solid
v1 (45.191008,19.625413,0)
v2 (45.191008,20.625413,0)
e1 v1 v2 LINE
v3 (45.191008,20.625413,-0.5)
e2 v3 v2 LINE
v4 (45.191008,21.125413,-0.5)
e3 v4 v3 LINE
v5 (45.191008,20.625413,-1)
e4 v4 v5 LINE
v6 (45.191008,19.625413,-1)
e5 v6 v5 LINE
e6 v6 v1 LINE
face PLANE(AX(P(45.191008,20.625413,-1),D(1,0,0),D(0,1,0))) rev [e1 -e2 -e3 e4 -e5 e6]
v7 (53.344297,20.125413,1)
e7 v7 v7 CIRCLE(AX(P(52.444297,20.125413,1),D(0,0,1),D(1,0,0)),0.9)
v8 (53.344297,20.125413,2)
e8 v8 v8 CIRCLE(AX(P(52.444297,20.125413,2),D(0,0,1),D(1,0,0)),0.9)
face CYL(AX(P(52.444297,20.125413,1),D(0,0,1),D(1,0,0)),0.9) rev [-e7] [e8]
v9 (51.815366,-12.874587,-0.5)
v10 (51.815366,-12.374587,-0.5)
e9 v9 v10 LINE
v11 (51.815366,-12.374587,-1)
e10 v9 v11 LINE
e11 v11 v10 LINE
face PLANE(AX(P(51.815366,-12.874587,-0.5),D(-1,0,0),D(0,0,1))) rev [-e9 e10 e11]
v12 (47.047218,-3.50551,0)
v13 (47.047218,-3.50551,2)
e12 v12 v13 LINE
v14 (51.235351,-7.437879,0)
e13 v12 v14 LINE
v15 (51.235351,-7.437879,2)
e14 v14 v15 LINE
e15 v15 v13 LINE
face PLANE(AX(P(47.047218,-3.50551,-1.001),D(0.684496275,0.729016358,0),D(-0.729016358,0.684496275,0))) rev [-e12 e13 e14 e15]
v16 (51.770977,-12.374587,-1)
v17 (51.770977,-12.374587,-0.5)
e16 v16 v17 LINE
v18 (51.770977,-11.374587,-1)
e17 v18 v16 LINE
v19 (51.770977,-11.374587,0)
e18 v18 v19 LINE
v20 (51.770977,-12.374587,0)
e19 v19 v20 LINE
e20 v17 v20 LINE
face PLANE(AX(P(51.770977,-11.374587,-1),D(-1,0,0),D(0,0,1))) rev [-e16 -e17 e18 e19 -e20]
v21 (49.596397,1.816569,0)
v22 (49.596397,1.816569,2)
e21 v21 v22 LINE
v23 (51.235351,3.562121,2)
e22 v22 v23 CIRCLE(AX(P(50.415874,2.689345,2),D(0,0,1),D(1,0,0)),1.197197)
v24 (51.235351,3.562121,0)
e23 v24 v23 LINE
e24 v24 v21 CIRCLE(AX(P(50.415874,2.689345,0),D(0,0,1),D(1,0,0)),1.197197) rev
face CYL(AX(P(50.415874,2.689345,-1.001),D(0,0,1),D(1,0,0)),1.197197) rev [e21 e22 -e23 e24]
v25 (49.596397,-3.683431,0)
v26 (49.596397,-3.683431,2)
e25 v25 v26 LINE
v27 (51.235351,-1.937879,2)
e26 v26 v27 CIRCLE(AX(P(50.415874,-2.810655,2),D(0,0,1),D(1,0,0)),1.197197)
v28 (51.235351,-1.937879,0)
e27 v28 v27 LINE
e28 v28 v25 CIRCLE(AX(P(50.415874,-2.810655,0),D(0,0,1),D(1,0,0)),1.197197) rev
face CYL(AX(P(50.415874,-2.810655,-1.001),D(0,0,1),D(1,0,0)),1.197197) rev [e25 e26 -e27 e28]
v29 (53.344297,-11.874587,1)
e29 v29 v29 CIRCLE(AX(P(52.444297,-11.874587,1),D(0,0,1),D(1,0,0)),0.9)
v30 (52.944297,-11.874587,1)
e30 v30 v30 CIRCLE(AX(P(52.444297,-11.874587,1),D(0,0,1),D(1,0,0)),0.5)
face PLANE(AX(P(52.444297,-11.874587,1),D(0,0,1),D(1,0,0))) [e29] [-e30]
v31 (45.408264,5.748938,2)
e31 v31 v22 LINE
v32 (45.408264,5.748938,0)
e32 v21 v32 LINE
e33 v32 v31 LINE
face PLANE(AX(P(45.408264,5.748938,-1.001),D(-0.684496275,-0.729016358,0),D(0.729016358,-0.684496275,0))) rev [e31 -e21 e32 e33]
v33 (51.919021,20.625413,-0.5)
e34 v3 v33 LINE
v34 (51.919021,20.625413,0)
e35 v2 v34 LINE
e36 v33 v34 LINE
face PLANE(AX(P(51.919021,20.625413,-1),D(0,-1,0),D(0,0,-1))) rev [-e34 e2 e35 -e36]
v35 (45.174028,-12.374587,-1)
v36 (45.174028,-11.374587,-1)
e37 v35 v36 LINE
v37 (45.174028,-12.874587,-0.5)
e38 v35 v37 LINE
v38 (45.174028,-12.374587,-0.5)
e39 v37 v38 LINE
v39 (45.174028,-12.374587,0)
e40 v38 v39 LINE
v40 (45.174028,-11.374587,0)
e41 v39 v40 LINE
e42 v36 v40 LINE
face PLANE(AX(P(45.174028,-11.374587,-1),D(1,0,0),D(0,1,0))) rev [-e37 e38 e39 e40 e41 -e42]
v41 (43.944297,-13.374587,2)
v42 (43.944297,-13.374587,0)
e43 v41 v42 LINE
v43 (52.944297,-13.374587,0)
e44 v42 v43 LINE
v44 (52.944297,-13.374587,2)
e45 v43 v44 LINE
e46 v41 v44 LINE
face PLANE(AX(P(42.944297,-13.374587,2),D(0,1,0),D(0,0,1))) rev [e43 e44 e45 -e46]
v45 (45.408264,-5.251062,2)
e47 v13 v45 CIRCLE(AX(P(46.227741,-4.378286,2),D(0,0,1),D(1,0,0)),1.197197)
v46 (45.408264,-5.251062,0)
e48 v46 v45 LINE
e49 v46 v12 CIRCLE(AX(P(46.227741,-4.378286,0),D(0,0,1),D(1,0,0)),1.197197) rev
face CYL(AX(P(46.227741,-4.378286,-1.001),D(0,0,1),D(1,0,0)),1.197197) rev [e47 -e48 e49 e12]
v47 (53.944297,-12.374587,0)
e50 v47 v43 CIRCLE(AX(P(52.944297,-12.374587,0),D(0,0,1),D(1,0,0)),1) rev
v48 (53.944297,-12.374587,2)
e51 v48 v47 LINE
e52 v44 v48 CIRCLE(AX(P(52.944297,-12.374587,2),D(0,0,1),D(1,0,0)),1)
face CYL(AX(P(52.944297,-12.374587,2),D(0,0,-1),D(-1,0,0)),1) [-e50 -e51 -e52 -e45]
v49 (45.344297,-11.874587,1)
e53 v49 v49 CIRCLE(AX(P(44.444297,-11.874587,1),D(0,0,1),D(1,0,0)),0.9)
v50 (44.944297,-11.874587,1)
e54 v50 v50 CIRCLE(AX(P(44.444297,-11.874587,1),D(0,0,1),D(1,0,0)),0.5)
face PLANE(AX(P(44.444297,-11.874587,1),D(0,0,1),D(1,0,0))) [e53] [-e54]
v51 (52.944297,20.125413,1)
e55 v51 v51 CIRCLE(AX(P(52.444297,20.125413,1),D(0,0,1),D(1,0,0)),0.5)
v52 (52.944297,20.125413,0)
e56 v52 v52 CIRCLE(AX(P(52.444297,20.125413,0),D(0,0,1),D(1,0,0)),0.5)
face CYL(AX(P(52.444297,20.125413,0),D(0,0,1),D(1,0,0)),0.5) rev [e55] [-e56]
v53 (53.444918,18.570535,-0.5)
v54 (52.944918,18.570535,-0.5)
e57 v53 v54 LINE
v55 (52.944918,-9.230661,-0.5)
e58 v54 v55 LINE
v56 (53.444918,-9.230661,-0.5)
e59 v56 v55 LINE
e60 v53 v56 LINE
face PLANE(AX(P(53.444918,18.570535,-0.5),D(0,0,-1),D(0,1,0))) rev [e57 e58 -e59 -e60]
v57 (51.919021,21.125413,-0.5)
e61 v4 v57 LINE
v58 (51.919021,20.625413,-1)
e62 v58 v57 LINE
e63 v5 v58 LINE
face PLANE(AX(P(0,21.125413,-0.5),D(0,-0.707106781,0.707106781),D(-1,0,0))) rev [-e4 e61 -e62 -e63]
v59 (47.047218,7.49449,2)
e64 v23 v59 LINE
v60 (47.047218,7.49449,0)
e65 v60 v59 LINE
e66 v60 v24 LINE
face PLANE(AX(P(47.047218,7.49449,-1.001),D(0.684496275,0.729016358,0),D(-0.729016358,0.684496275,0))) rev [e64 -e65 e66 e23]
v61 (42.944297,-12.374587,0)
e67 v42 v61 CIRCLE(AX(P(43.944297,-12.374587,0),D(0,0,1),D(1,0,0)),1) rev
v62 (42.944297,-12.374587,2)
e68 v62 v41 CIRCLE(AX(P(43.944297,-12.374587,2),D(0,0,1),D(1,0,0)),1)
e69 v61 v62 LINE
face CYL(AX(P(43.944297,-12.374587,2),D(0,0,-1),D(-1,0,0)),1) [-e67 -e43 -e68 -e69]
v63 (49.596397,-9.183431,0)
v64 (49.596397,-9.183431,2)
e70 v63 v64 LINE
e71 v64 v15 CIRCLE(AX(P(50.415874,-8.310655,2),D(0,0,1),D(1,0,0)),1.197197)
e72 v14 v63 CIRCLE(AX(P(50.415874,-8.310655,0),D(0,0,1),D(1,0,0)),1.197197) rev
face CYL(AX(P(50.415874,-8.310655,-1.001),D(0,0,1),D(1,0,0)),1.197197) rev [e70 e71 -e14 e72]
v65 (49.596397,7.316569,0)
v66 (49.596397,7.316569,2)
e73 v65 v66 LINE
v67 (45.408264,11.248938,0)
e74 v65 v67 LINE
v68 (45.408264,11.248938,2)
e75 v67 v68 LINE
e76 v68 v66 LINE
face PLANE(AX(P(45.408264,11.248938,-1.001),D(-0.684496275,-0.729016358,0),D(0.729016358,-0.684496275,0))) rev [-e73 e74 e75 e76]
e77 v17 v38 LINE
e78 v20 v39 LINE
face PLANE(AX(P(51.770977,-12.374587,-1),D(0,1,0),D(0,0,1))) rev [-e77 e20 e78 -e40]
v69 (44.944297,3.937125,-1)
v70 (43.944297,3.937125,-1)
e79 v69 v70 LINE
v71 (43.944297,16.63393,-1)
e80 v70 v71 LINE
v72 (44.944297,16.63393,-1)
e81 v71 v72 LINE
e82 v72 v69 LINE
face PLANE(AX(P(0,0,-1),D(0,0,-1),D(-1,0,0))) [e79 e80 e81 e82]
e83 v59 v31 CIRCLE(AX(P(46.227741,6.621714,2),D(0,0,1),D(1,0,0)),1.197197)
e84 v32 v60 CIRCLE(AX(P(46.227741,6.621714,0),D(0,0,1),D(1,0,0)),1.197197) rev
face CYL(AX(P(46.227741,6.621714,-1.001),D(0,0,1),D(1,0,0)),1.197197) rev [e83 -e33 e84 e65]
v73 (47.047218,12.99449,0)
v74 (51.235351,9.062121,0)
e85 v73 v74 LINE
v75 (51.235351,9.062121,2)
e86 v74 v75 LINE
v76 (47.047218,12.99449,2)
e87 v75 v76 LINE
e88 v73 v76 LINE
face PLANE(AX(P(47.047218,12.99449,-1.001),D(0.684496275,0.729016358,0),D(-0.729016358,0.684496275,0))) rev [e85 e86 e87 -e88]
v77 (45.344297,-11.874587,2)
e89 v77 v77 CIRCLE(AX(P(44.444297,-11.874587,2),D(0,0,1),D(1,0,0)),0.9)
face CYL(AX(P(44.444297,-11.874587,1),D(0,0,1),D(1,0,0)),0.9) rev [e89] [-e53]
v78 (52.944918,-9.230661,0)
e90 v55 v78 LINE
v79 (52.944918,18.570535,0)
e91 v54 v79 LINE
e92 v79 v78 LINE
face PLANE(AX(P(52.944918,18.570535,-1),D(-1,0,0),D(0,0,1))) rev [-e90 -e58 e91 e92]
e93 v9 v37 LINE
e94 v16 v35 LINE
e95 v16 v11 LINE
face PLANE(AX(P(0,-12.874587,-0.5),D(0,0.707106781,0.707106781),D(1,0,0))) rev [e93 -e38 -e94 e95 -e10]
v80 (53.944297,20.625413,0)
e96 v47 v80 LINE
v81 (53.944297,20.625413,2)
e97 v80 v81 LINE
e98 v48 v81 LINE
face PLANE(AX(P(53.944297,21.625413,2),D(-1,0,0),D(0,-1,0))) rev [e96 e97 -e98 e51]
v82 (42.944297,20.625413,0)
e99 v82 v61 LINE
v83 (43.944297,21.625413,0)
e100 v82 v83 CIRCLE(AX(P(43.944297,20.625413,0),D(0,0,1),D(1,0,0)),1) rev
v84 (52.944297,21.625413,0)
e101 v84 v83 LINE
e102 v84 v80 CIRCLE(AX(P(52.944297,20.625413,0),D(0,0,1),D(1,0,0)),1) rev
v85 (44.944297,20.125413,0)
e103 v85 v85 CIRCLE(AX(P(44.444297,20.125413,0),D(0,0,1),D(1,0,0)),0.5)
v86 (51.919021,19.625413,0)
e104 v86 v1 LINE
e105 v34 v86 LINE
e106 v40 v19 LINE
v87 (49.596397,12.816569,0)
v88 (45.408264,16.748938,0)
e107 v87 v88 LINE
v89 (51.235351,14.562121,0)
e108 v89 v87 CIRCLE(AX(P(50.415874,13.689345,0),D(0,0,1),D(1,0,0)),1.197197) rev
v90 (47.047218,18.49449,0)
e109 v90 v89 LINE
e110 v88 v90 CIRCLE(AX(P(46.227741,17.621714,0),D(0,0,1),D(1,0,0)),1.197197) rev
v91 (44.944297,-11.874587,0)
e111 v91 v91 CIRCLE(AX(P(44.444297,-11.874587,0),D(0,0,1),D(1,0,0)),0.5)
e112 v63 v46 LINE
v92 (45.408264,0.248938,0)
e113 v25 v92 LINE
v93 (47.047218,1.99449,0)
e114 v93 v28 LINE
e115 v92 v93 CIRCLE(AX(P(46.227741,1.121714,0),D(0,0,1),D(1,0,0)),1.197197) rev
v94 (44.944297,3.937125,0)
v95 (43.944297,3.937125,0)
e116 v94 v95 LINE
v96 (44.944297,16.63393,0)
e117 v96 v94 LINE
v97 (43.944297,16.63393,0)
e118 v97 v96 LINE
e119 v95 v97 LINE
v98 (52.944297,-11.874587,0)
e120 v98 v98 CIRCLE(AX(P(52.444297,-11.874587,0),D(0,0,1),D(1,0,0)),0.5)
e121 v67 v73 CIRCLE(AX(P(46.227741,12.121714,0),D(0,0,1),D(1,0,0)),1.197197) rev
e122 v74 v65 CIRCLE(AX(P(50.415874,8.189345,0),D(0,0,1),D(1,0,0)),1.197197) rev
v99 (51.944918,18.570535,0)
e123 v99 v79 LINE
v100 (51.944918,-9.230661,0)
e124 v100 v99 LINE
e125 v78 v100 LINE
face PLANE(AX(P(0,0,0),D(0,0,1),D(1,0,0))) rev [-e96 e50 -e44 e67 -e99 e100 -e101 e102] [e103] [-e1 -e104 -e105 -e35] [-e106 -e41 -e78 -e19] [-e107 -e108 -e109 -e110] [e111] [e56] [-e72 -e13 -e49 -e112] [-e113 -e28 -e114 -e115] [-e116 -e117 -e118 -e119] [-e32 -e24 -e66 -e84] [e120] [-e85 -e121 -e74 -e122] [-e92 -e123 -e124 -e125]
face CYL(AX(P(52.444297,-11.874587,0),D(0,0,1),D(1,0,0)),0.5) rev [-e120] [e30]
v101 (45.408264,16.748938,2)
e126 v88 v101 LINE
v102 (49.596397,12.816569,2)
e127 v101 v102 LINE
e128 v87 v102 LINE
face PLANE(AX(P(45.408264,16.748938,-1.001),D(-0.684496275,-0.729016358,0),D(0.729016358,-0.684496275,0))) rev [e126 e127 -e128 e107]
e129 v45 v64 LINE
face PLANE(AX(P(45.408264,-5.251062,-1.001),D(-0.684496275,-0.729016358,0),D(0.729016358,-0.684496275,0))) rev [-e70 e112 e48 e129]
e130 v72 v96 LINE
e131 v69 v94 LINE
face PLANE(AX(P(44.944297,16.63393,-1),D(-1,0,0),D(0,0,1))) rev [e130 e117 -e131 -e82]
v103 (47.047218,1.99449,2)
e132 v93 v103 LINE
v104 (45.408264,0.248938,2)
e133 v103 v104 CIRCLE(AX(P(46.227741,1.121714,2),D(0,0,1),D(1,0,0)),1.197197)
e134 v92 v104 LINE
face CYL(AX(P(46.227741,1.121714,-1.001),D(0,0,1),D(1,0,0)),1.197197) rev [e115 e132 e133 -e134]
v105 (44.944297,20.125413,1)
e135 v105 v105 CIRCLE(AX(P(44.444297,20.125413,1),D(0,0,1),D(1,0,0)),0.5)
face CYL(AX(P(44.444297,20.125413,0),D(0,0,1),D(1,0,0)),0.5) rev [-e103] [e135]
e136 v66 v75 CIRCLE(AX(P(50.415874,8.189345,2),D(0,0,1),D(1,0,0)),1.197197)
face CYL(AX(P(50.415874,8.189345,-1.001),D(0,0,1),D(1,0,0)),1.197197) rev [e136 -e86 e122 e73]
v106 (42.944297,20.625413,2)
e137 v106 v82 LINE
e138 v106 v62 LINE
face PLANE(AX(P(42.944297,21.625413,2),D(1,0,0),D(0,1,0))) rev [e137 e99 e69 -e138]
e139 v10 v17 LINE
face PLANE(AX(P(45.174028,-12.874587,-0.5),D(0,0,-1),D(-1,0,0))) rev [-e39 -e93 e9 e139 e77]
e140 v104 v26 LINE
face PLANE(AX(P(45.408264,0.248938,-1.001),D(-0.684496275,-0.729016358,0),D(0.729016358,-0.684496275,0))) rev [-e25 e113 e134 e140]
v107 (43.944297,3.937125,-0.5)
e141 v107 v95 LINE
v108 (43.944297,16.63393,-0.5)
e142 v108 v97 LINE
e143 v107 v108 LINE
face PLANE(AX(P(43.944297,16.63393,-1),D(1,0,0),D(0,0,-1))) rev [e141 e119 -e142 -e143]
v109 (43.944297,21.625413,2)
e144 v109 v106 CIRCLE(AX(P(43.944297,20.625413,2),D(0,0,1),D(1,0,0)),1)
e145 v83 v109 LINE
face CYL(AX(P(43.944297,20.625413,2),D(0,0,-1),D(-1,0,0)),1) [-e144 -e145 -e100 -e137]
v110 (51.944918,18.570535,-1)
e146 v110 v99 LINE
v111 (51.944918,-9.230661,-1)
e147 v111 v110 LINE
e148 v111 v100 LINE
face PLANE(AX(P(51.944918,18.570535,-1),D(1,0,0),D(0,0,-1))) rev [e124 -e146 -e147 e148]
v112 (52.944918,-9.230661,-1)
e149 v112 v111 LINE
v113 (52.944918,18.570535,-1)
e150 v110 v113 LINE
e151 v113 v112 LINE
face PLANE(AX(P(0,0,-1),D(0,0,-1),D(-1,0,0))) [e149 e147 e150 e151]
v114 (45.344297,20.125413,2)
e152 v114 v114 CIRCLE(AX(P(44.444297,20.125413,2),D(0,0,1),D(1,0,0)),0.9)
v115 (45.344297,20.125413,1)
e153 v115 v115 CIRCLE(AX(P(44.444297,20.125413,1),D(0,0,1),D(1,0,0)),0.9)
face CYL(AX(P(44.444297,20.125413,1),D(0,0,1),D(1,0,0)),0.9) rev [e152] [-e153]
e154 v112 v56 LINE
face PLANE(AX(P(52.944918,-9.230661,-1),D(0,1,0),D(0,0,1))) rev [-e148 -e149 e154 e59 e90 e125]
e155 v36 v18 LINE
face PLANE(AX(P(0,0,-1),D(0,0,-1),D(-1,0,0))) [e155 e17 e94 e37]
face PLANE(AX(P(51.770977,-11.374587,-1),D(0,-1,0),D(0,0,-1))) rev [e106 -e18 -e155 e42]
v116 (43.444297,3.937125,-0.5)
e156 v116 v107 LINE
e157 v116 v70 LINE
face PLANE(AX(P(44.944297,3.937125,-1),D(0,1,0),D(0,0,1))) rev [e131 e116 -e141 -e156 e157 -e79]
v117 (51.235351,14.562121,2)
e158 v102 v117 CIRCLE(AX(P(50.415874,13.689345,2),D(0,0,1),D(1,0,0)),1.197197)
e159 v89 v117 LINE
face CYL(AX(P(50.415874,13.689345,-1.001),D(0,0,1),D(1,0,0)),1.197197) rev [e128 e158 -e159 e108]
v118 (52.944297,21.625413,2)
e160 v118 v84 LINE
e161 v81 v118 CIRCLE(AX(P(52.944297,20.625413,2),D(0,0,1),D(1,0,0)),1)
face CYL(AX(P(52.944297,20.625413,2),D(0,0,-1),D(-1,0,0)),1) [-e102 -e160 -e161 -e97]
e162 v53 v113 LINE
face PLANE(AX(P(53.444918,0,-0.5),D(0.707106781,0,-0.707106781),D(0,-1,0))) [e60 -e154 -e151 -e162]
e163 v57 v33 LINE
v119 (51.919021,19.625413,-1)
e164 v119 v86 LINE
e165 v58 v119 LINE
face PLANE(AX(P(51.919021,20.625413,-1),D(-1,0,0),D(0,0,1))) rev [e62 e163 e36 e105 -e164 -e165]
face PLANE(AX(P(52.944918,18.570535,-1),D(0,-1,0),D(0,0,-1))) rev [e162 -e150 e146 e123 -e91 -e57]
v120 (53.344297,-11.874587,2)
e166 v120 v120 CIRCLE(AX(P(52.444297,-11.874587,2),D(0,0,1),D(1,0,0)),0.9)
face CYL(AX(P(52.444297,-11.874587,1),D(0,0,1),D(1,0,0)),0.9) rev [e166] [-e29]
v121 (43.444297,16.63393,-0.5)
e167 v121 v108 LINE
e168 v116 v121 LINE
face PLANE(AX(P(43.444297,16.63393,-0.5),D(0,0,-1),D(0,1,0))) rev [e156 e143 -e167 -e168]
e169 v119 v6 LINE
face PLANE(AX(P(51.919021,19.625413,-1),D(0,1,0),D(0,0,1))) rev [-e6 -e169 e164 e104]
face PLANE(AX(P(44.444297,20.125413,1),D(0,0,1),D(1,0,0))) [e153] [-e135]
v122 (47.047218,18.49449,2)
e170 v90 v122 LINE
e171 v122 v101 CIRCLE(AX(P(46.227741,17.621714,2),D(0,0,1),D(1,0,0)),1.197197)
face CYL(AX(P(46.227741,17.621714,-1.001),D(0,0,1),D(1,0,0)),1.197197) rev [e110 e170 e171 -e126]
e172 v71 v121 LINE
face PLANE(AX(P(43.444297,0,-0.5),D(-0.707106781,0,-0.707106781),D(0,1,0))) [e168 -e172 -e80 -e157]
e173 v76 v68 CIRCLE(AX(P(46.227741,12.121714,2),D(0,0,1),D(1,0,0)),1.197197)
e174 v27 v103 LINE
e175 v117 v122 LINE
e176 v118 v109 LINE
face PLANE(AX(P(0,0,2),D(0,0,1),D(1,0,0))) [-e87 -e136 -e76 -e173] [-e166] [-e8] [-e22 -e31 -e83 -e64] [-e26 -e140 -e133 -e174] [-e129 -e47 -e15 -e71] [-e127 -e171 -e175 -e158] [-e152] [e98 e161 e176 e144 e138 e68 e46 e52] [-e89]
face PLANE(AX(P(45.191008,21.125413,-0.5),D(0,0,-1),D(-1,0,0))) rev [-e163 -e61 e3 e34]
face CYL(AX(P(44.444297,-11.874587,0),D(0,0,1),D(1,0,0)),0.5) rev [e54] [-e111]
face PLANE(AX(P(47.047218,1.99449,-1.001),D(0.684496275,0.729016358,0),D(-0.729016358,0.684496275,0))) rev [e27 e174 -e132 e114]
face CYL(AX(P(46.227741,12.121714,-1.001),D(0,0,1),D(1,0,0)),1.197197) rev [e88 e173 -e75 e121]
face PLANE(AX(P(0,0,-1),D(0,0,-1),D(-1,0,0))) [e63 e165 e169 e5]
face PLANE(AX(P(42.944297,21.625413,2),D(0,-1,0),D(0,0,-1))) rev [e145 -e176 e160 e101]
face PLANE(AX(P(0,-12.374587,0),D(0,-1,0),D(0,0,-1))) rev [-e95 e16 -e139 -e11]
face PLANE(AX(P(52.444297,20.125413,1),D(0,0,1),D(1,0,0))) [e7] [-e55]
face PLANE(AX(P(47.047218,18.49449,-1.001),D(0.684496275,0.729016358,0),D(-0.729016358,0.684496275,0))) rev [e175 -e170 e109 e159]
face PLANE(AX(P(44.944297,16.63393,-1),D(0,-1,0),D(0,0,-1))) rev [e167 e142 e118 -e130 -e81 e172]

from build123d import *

# Parameters (mm, degrees)
SKETCH_1_W          = 11
SKETCH_1_H          = 35
EXTRUDE_1_DEPTH     = 2
FILLET_1_R          = 1
SKETCH_2_W          = 1
SKETCH_2_H          = 27.801195883
SKETCH_2_H_2        = 12.696804569
SKETCH_2_W_2        = 6.728012357
SKETCH_2_H_3        = 1
SKETCH_2_W_3        = 6.596948746
EXTRUDE_2_DEPTH     = 1
SKETCH_3_W          = 6.641337803
SKETCH_3_H          = 0.5
EXTRUDE_3_DEPTH     = 0.5
SKETCH_4_W          = 0.5
SKETCH_4_H          = 12.696804569
EXTRUDE_4_DEPTH     = 0.5
SKETCH_5_W          = 6.728012357
SKETCH_5_H          = 0.5
EXTRUDE_5_DEPTH     = 0.5
SKETCH_6_W          = 0.5
SKETCH_6_H          = 27.801195883
EXTRUDE_6_DEPTH     = 0.5
CHAMFER_1_SIZE      = 0.5
CUT_EXTRUDE_1_REACH = 60.195
SKETCH_8_R          = 0.9
CUT_EXTRUDE_2_DEPTH = 1
SKETCH_9_R          = 0.5
CUT_EXTRUDE_3_DEPTH = 1


with BuildPart() as part:
    # 草图1 → 凸台-拉伸1 (new body)
    with BuildSketch(Plane.XY):
        with Locations((48.44429715, 4.125412508)):
            Rectangle(SKETCH_1_W, SKETCH_1_H)
    extrude(amount=EXTRUDE_1_DEPTH)

    # 圆角1
    fillet_1_edges = [part.edges().sort_by_distance(p)[0] for p in [
        (42.94429715, 21.625412508, 1),
        (53.94429715, 21.625412508, 1),
        (53.94429715, -13.374587492, 1),
        (42.94429715, -13.374587492, 1),
    ]]
    fillet(fillet_1_edges, radius=FILLET_1_R)

    # 草图2 → 凸台-拉伸2 (add)
    with BuildSketch(Plane(origin=(0, 0, 0), x_dir=(-1, 0, 0), z_dir=(0, 0, -1))):
        with Locations((-52.444918102, 4.669937054)):
            Rectangle(SKETCH_2_W, SKETCH_2_H)
        with Locations((-44.44429715, 10.285527485)):
            Rectangle(SKETCH_2_W, SKETCH_2_H_2)
        with Locations((-48.555014421, 20.125412508)):
            Rectangle(SKETCH_2_W_2, SKETCH_2_H_3)
        with Locations((-48.47250239, -11.874587492)):
            Rectangle(SKETCH_2_W_3, SKETCH_2_H_3)
    extrude(amount=EXTRUDE_2_DEPTH)

    # 草图3 → 凸台-拉伸3 (add)
    with BuildSketch(Plane.XZ.offset(12.374587492)):
        with Locations((48.494696919, -0.75)):
            Rectangle(SKETCH_3_W, SKETCH_3_H)
    extrude(amount=EXTRUDE_3_DEPTH)

    # 草图4 → 凸台-拉伸4 (add)
    with BuildSketch(Plane.ZY.offset(-43.94429715)):
        with Locations((-0.75, 10.285527485)):
            Rectangle(SKETCH_4_W, SKETCH_4_H)
    extrude(amount=EXTRUDE_4_DEPTH)

    # 草图5 → 凸台-拉伸5 (add)
    with BuildSketch(Plane(origin=(0, 20.625412508, 0), x_dir=(1, 0, 0), z_dir=(0, 1, 0))):
        with Locations((48.555014421, 0.75)):
            Rectangle(SKETCH_5_W, SKETCH_5_H)
    extrude(amount=EXTRUDE_5_DEPTH)

    # 草图6 → 凸台-拉伸6 (add)
    with BuildSketch(Plane(origin=(52.944918102, 0, 0), x_dir=(0, 0, -1), z_dir=(1, 0, 0))):
        with Locations((0.75, 4.669937054)):
            Rectangle(SKETCH_6_W, SKETCH_6_H)
    extrude(amount=EXTRUDE_6_DEPTH)

    # 倒角1
    chamfer_1_edges = [part.edges().sort_by_distance(p)[0] for p in [
        (48.494696919, -12.874587492, -1),
        (53.444918102, 4.669937054, -1),
        (48.555014421, 21.125412508, -1),
        (43.44429715, 10.285527485, -1),
    ]]
    chamfer(chamfer_1_edges, length=CHAMFER_1_SIZE - 0.0001)  # a hair under: the kernel refuses the full size

    # 草图7 → 切除-拉伸1 (cut, up to next)
    with BuildSketch(Plane.XY.offset(2), mode=Mode.PRIVATE) as cut_extrude_1_sk1:
        with BuildLine():
            Line((47.04721821, 18.494490282), (51.235350906, 14.562121415))
            ThreePointArc((51.235350906, 14.562121415), (51.288650219, 12.86986824), (49.596397044, 12.816568927))
            Line((49.596397044, 12.816568927), (45.408264348, 16.748937794))
            ThreePointArc((45.408264348, 16.748937794), (45.354965035, 18.441190969), (47.04721821, 18.494490282))
        make_face()
    cut_extrude_1_tool1 = extrude(cut_extrude_1_sk1.sketch, amount=-CUT_EXTRUDE_1_REACH, mode=Mode.PRIVATE) & part.part
    # 草图7 → 切除-拉伸1 (cut, up to next)
    with BuildSketch(Plane.XY.offset(2), mode=Mode.PRIVATE) as cut_extrude_1_sk2:
        with BuildLine():
            Line((45.408264348, 11.248937794), (49.596397044, 7.316568927))
            ThreePointArc((49.596397044, 7.316568927), (51.288650219, 7.36986824), (51.235350906, 9.062121415))
            Line((51.235350906, 9.062121415), (47.04721821, 12.994490282))
            ThreePointArc((47.04721821, 12.994490282), (45.354965035, 12.941190969), (45.408264348, 11.248937794))
        make_face()
    cut_extrude_1_tool2 = extrude(cut_extrude_1_sk2.sketch, amount=-CUT_EXTRUDE_1_REACH, mode=Mode.PRIVATE) & part.part
    # 草图7 → 切除-拉伸1 (cut, up to next)
    with BuildSketch(Plane.XY.offset(2), mode=Mode.PRIVATE) as cut_extrude_1_sk3:
        with BuildLine():
            Line((45.408264348, 5.748937794), (49.596397044, 1.816568927))
            ThreePointArc((49.596397044, 1.816568927), (51.288650219, 1.86986824), (51.235350906, 3.562121415))
            Line((51.235350906, 3.562121415), (47.04721821, 7.494490282))
            ThreePointArc((47.04721821, 7.494490282), (45.354965035, 7.441190969), (45.408264348, 5.748937794))
        make_face()
    cut_extrude_1_tool3 = extrude(cut_extrude_1_sk3.sketch, amount=-CUT_EXTRUDE_1_REACH, mode=Mode.PRIVATE) & part.part
    # 草图7 → 切除-拉伸1 (cut, up to next)
    with BuildSketch(Plane.XY.offset(2), mode=Mode.PRIVATE) as cut_extrude_1_sk4:
        with BuildLine():
            Line((45.408264348, 0.248937794), (49.596397044, -3.683431073))
            ThreePointArc((49.596397044, -3.683431073), (51.288650219, -3.63013176), (51.235350906, -1.937878585))
            Line((51.235350906, -1.937878585), (47.04721821, 1.994490282))
            ThreePointArc((47.04721821, 1.994490282), (45.354965035, 1.941190969), (45.408264348, 0.248937794))
        make_face()
    cut_extrude_1_tool4 = extrude(cut_extrude_1_sk4.sketch, amount=-CUT_EXTRUDE_1_REACH, mode=Mode.PRIVATE) & part.part
    # 草图7 → 切除-拉伸1 (cut, up to next)
    with BuildSketch(Plane.XY.offset(2), mode=Mode.PRIVATE) as cut_extrude_1_sk5:
        with BuildLine():
            Line((45.408264348, -5.251062206), (49.596397044, -9.183431073))
            ThreePointArc((49.596397044, -9.183431073), (51.288650219, -9.13013176), (51.235350906, -7.437878585))
            Line((51.235350906, -7.437878585), (47.04721821, -3.505509718))
            ThreePointArc((47.04721821, -3.505509718), (45.354965035, -3.558809031), (45.408264348, -5.251062206))
        make_face()
    cut_extrude_1_tool5 = extrude(cut_extrude_1_sk5.sketch, amount=-CUT_EXTRUDE_1_REACH, mode=Mode.PRIVATE) & part.part
    add(cut_extrude_1_tool1.solids().sort_by_distance((48.321808, 15.65553, 2))[0], mode=Mode.SUBTRACT)
    add(cut_extrude_1_tool2.solids().sort_by_distance((48.321808, 10.15553, 2))[0], mode=Mode.SUBTRACT)
    add(cut_extrude_1_tool3.solids().sort_by_distance((48.321808, 4.65553, 2))[0], mode=Mode.SUBTRACT)
    add(cut_extrude_1_tool4.solids().sort_by_distance((48.321808, -0.84447, 2))[0], mode=Mode.SUBTRACT)
    add(cut_extrude_1_tool5.solids().sort_by_distance((48.321808, -6.34447, 2))[0], mode=Mode.SUBTRACT)

    # 草图8 → 切除-拉伸2 (cut)
    with BuildSketch(Plane.XY.offset(2)):
        with Locations((44.44429715, 20.125412508)):
            Circle(SKETCH_8_R)
        with Locations((52.44429715, 20.125412508)):
            Circle(SKETCH_8_R)
        with Locations((44.44429715, -11.874587492)):
            Circle(SKETCH_8_R)
        with Locations((52.44429715, -11.874587492)):
            Circle(SKETCH_8_R)
    extrude(amount=-CUT_EXTRUDE_2_DEPTH, mode=Mode.SUBTRACT)

    # 草图9 → 切除-拉伸3 (cut)
    with BuildSketch(Plane.XY.offset(1)):
        with Locations((44.44429715, 20.125412508)):
            Circle(SKETCH_9_R)
        with Locations((52.44429715, 20.125412508)):
            Circle(SKETCH_9_R)
        with Locations((52.44429715, -11.874587492)):
            Circle(SKETCH_9_R)
        with Locations((44.44429715, -11.874587492)):
            Circle(SKETCH_9_R)
    extrude(amount=-CUT_EXTRUDE_3_DEPTH, mode=Mode.SUBTRACT)


solid = part.part
